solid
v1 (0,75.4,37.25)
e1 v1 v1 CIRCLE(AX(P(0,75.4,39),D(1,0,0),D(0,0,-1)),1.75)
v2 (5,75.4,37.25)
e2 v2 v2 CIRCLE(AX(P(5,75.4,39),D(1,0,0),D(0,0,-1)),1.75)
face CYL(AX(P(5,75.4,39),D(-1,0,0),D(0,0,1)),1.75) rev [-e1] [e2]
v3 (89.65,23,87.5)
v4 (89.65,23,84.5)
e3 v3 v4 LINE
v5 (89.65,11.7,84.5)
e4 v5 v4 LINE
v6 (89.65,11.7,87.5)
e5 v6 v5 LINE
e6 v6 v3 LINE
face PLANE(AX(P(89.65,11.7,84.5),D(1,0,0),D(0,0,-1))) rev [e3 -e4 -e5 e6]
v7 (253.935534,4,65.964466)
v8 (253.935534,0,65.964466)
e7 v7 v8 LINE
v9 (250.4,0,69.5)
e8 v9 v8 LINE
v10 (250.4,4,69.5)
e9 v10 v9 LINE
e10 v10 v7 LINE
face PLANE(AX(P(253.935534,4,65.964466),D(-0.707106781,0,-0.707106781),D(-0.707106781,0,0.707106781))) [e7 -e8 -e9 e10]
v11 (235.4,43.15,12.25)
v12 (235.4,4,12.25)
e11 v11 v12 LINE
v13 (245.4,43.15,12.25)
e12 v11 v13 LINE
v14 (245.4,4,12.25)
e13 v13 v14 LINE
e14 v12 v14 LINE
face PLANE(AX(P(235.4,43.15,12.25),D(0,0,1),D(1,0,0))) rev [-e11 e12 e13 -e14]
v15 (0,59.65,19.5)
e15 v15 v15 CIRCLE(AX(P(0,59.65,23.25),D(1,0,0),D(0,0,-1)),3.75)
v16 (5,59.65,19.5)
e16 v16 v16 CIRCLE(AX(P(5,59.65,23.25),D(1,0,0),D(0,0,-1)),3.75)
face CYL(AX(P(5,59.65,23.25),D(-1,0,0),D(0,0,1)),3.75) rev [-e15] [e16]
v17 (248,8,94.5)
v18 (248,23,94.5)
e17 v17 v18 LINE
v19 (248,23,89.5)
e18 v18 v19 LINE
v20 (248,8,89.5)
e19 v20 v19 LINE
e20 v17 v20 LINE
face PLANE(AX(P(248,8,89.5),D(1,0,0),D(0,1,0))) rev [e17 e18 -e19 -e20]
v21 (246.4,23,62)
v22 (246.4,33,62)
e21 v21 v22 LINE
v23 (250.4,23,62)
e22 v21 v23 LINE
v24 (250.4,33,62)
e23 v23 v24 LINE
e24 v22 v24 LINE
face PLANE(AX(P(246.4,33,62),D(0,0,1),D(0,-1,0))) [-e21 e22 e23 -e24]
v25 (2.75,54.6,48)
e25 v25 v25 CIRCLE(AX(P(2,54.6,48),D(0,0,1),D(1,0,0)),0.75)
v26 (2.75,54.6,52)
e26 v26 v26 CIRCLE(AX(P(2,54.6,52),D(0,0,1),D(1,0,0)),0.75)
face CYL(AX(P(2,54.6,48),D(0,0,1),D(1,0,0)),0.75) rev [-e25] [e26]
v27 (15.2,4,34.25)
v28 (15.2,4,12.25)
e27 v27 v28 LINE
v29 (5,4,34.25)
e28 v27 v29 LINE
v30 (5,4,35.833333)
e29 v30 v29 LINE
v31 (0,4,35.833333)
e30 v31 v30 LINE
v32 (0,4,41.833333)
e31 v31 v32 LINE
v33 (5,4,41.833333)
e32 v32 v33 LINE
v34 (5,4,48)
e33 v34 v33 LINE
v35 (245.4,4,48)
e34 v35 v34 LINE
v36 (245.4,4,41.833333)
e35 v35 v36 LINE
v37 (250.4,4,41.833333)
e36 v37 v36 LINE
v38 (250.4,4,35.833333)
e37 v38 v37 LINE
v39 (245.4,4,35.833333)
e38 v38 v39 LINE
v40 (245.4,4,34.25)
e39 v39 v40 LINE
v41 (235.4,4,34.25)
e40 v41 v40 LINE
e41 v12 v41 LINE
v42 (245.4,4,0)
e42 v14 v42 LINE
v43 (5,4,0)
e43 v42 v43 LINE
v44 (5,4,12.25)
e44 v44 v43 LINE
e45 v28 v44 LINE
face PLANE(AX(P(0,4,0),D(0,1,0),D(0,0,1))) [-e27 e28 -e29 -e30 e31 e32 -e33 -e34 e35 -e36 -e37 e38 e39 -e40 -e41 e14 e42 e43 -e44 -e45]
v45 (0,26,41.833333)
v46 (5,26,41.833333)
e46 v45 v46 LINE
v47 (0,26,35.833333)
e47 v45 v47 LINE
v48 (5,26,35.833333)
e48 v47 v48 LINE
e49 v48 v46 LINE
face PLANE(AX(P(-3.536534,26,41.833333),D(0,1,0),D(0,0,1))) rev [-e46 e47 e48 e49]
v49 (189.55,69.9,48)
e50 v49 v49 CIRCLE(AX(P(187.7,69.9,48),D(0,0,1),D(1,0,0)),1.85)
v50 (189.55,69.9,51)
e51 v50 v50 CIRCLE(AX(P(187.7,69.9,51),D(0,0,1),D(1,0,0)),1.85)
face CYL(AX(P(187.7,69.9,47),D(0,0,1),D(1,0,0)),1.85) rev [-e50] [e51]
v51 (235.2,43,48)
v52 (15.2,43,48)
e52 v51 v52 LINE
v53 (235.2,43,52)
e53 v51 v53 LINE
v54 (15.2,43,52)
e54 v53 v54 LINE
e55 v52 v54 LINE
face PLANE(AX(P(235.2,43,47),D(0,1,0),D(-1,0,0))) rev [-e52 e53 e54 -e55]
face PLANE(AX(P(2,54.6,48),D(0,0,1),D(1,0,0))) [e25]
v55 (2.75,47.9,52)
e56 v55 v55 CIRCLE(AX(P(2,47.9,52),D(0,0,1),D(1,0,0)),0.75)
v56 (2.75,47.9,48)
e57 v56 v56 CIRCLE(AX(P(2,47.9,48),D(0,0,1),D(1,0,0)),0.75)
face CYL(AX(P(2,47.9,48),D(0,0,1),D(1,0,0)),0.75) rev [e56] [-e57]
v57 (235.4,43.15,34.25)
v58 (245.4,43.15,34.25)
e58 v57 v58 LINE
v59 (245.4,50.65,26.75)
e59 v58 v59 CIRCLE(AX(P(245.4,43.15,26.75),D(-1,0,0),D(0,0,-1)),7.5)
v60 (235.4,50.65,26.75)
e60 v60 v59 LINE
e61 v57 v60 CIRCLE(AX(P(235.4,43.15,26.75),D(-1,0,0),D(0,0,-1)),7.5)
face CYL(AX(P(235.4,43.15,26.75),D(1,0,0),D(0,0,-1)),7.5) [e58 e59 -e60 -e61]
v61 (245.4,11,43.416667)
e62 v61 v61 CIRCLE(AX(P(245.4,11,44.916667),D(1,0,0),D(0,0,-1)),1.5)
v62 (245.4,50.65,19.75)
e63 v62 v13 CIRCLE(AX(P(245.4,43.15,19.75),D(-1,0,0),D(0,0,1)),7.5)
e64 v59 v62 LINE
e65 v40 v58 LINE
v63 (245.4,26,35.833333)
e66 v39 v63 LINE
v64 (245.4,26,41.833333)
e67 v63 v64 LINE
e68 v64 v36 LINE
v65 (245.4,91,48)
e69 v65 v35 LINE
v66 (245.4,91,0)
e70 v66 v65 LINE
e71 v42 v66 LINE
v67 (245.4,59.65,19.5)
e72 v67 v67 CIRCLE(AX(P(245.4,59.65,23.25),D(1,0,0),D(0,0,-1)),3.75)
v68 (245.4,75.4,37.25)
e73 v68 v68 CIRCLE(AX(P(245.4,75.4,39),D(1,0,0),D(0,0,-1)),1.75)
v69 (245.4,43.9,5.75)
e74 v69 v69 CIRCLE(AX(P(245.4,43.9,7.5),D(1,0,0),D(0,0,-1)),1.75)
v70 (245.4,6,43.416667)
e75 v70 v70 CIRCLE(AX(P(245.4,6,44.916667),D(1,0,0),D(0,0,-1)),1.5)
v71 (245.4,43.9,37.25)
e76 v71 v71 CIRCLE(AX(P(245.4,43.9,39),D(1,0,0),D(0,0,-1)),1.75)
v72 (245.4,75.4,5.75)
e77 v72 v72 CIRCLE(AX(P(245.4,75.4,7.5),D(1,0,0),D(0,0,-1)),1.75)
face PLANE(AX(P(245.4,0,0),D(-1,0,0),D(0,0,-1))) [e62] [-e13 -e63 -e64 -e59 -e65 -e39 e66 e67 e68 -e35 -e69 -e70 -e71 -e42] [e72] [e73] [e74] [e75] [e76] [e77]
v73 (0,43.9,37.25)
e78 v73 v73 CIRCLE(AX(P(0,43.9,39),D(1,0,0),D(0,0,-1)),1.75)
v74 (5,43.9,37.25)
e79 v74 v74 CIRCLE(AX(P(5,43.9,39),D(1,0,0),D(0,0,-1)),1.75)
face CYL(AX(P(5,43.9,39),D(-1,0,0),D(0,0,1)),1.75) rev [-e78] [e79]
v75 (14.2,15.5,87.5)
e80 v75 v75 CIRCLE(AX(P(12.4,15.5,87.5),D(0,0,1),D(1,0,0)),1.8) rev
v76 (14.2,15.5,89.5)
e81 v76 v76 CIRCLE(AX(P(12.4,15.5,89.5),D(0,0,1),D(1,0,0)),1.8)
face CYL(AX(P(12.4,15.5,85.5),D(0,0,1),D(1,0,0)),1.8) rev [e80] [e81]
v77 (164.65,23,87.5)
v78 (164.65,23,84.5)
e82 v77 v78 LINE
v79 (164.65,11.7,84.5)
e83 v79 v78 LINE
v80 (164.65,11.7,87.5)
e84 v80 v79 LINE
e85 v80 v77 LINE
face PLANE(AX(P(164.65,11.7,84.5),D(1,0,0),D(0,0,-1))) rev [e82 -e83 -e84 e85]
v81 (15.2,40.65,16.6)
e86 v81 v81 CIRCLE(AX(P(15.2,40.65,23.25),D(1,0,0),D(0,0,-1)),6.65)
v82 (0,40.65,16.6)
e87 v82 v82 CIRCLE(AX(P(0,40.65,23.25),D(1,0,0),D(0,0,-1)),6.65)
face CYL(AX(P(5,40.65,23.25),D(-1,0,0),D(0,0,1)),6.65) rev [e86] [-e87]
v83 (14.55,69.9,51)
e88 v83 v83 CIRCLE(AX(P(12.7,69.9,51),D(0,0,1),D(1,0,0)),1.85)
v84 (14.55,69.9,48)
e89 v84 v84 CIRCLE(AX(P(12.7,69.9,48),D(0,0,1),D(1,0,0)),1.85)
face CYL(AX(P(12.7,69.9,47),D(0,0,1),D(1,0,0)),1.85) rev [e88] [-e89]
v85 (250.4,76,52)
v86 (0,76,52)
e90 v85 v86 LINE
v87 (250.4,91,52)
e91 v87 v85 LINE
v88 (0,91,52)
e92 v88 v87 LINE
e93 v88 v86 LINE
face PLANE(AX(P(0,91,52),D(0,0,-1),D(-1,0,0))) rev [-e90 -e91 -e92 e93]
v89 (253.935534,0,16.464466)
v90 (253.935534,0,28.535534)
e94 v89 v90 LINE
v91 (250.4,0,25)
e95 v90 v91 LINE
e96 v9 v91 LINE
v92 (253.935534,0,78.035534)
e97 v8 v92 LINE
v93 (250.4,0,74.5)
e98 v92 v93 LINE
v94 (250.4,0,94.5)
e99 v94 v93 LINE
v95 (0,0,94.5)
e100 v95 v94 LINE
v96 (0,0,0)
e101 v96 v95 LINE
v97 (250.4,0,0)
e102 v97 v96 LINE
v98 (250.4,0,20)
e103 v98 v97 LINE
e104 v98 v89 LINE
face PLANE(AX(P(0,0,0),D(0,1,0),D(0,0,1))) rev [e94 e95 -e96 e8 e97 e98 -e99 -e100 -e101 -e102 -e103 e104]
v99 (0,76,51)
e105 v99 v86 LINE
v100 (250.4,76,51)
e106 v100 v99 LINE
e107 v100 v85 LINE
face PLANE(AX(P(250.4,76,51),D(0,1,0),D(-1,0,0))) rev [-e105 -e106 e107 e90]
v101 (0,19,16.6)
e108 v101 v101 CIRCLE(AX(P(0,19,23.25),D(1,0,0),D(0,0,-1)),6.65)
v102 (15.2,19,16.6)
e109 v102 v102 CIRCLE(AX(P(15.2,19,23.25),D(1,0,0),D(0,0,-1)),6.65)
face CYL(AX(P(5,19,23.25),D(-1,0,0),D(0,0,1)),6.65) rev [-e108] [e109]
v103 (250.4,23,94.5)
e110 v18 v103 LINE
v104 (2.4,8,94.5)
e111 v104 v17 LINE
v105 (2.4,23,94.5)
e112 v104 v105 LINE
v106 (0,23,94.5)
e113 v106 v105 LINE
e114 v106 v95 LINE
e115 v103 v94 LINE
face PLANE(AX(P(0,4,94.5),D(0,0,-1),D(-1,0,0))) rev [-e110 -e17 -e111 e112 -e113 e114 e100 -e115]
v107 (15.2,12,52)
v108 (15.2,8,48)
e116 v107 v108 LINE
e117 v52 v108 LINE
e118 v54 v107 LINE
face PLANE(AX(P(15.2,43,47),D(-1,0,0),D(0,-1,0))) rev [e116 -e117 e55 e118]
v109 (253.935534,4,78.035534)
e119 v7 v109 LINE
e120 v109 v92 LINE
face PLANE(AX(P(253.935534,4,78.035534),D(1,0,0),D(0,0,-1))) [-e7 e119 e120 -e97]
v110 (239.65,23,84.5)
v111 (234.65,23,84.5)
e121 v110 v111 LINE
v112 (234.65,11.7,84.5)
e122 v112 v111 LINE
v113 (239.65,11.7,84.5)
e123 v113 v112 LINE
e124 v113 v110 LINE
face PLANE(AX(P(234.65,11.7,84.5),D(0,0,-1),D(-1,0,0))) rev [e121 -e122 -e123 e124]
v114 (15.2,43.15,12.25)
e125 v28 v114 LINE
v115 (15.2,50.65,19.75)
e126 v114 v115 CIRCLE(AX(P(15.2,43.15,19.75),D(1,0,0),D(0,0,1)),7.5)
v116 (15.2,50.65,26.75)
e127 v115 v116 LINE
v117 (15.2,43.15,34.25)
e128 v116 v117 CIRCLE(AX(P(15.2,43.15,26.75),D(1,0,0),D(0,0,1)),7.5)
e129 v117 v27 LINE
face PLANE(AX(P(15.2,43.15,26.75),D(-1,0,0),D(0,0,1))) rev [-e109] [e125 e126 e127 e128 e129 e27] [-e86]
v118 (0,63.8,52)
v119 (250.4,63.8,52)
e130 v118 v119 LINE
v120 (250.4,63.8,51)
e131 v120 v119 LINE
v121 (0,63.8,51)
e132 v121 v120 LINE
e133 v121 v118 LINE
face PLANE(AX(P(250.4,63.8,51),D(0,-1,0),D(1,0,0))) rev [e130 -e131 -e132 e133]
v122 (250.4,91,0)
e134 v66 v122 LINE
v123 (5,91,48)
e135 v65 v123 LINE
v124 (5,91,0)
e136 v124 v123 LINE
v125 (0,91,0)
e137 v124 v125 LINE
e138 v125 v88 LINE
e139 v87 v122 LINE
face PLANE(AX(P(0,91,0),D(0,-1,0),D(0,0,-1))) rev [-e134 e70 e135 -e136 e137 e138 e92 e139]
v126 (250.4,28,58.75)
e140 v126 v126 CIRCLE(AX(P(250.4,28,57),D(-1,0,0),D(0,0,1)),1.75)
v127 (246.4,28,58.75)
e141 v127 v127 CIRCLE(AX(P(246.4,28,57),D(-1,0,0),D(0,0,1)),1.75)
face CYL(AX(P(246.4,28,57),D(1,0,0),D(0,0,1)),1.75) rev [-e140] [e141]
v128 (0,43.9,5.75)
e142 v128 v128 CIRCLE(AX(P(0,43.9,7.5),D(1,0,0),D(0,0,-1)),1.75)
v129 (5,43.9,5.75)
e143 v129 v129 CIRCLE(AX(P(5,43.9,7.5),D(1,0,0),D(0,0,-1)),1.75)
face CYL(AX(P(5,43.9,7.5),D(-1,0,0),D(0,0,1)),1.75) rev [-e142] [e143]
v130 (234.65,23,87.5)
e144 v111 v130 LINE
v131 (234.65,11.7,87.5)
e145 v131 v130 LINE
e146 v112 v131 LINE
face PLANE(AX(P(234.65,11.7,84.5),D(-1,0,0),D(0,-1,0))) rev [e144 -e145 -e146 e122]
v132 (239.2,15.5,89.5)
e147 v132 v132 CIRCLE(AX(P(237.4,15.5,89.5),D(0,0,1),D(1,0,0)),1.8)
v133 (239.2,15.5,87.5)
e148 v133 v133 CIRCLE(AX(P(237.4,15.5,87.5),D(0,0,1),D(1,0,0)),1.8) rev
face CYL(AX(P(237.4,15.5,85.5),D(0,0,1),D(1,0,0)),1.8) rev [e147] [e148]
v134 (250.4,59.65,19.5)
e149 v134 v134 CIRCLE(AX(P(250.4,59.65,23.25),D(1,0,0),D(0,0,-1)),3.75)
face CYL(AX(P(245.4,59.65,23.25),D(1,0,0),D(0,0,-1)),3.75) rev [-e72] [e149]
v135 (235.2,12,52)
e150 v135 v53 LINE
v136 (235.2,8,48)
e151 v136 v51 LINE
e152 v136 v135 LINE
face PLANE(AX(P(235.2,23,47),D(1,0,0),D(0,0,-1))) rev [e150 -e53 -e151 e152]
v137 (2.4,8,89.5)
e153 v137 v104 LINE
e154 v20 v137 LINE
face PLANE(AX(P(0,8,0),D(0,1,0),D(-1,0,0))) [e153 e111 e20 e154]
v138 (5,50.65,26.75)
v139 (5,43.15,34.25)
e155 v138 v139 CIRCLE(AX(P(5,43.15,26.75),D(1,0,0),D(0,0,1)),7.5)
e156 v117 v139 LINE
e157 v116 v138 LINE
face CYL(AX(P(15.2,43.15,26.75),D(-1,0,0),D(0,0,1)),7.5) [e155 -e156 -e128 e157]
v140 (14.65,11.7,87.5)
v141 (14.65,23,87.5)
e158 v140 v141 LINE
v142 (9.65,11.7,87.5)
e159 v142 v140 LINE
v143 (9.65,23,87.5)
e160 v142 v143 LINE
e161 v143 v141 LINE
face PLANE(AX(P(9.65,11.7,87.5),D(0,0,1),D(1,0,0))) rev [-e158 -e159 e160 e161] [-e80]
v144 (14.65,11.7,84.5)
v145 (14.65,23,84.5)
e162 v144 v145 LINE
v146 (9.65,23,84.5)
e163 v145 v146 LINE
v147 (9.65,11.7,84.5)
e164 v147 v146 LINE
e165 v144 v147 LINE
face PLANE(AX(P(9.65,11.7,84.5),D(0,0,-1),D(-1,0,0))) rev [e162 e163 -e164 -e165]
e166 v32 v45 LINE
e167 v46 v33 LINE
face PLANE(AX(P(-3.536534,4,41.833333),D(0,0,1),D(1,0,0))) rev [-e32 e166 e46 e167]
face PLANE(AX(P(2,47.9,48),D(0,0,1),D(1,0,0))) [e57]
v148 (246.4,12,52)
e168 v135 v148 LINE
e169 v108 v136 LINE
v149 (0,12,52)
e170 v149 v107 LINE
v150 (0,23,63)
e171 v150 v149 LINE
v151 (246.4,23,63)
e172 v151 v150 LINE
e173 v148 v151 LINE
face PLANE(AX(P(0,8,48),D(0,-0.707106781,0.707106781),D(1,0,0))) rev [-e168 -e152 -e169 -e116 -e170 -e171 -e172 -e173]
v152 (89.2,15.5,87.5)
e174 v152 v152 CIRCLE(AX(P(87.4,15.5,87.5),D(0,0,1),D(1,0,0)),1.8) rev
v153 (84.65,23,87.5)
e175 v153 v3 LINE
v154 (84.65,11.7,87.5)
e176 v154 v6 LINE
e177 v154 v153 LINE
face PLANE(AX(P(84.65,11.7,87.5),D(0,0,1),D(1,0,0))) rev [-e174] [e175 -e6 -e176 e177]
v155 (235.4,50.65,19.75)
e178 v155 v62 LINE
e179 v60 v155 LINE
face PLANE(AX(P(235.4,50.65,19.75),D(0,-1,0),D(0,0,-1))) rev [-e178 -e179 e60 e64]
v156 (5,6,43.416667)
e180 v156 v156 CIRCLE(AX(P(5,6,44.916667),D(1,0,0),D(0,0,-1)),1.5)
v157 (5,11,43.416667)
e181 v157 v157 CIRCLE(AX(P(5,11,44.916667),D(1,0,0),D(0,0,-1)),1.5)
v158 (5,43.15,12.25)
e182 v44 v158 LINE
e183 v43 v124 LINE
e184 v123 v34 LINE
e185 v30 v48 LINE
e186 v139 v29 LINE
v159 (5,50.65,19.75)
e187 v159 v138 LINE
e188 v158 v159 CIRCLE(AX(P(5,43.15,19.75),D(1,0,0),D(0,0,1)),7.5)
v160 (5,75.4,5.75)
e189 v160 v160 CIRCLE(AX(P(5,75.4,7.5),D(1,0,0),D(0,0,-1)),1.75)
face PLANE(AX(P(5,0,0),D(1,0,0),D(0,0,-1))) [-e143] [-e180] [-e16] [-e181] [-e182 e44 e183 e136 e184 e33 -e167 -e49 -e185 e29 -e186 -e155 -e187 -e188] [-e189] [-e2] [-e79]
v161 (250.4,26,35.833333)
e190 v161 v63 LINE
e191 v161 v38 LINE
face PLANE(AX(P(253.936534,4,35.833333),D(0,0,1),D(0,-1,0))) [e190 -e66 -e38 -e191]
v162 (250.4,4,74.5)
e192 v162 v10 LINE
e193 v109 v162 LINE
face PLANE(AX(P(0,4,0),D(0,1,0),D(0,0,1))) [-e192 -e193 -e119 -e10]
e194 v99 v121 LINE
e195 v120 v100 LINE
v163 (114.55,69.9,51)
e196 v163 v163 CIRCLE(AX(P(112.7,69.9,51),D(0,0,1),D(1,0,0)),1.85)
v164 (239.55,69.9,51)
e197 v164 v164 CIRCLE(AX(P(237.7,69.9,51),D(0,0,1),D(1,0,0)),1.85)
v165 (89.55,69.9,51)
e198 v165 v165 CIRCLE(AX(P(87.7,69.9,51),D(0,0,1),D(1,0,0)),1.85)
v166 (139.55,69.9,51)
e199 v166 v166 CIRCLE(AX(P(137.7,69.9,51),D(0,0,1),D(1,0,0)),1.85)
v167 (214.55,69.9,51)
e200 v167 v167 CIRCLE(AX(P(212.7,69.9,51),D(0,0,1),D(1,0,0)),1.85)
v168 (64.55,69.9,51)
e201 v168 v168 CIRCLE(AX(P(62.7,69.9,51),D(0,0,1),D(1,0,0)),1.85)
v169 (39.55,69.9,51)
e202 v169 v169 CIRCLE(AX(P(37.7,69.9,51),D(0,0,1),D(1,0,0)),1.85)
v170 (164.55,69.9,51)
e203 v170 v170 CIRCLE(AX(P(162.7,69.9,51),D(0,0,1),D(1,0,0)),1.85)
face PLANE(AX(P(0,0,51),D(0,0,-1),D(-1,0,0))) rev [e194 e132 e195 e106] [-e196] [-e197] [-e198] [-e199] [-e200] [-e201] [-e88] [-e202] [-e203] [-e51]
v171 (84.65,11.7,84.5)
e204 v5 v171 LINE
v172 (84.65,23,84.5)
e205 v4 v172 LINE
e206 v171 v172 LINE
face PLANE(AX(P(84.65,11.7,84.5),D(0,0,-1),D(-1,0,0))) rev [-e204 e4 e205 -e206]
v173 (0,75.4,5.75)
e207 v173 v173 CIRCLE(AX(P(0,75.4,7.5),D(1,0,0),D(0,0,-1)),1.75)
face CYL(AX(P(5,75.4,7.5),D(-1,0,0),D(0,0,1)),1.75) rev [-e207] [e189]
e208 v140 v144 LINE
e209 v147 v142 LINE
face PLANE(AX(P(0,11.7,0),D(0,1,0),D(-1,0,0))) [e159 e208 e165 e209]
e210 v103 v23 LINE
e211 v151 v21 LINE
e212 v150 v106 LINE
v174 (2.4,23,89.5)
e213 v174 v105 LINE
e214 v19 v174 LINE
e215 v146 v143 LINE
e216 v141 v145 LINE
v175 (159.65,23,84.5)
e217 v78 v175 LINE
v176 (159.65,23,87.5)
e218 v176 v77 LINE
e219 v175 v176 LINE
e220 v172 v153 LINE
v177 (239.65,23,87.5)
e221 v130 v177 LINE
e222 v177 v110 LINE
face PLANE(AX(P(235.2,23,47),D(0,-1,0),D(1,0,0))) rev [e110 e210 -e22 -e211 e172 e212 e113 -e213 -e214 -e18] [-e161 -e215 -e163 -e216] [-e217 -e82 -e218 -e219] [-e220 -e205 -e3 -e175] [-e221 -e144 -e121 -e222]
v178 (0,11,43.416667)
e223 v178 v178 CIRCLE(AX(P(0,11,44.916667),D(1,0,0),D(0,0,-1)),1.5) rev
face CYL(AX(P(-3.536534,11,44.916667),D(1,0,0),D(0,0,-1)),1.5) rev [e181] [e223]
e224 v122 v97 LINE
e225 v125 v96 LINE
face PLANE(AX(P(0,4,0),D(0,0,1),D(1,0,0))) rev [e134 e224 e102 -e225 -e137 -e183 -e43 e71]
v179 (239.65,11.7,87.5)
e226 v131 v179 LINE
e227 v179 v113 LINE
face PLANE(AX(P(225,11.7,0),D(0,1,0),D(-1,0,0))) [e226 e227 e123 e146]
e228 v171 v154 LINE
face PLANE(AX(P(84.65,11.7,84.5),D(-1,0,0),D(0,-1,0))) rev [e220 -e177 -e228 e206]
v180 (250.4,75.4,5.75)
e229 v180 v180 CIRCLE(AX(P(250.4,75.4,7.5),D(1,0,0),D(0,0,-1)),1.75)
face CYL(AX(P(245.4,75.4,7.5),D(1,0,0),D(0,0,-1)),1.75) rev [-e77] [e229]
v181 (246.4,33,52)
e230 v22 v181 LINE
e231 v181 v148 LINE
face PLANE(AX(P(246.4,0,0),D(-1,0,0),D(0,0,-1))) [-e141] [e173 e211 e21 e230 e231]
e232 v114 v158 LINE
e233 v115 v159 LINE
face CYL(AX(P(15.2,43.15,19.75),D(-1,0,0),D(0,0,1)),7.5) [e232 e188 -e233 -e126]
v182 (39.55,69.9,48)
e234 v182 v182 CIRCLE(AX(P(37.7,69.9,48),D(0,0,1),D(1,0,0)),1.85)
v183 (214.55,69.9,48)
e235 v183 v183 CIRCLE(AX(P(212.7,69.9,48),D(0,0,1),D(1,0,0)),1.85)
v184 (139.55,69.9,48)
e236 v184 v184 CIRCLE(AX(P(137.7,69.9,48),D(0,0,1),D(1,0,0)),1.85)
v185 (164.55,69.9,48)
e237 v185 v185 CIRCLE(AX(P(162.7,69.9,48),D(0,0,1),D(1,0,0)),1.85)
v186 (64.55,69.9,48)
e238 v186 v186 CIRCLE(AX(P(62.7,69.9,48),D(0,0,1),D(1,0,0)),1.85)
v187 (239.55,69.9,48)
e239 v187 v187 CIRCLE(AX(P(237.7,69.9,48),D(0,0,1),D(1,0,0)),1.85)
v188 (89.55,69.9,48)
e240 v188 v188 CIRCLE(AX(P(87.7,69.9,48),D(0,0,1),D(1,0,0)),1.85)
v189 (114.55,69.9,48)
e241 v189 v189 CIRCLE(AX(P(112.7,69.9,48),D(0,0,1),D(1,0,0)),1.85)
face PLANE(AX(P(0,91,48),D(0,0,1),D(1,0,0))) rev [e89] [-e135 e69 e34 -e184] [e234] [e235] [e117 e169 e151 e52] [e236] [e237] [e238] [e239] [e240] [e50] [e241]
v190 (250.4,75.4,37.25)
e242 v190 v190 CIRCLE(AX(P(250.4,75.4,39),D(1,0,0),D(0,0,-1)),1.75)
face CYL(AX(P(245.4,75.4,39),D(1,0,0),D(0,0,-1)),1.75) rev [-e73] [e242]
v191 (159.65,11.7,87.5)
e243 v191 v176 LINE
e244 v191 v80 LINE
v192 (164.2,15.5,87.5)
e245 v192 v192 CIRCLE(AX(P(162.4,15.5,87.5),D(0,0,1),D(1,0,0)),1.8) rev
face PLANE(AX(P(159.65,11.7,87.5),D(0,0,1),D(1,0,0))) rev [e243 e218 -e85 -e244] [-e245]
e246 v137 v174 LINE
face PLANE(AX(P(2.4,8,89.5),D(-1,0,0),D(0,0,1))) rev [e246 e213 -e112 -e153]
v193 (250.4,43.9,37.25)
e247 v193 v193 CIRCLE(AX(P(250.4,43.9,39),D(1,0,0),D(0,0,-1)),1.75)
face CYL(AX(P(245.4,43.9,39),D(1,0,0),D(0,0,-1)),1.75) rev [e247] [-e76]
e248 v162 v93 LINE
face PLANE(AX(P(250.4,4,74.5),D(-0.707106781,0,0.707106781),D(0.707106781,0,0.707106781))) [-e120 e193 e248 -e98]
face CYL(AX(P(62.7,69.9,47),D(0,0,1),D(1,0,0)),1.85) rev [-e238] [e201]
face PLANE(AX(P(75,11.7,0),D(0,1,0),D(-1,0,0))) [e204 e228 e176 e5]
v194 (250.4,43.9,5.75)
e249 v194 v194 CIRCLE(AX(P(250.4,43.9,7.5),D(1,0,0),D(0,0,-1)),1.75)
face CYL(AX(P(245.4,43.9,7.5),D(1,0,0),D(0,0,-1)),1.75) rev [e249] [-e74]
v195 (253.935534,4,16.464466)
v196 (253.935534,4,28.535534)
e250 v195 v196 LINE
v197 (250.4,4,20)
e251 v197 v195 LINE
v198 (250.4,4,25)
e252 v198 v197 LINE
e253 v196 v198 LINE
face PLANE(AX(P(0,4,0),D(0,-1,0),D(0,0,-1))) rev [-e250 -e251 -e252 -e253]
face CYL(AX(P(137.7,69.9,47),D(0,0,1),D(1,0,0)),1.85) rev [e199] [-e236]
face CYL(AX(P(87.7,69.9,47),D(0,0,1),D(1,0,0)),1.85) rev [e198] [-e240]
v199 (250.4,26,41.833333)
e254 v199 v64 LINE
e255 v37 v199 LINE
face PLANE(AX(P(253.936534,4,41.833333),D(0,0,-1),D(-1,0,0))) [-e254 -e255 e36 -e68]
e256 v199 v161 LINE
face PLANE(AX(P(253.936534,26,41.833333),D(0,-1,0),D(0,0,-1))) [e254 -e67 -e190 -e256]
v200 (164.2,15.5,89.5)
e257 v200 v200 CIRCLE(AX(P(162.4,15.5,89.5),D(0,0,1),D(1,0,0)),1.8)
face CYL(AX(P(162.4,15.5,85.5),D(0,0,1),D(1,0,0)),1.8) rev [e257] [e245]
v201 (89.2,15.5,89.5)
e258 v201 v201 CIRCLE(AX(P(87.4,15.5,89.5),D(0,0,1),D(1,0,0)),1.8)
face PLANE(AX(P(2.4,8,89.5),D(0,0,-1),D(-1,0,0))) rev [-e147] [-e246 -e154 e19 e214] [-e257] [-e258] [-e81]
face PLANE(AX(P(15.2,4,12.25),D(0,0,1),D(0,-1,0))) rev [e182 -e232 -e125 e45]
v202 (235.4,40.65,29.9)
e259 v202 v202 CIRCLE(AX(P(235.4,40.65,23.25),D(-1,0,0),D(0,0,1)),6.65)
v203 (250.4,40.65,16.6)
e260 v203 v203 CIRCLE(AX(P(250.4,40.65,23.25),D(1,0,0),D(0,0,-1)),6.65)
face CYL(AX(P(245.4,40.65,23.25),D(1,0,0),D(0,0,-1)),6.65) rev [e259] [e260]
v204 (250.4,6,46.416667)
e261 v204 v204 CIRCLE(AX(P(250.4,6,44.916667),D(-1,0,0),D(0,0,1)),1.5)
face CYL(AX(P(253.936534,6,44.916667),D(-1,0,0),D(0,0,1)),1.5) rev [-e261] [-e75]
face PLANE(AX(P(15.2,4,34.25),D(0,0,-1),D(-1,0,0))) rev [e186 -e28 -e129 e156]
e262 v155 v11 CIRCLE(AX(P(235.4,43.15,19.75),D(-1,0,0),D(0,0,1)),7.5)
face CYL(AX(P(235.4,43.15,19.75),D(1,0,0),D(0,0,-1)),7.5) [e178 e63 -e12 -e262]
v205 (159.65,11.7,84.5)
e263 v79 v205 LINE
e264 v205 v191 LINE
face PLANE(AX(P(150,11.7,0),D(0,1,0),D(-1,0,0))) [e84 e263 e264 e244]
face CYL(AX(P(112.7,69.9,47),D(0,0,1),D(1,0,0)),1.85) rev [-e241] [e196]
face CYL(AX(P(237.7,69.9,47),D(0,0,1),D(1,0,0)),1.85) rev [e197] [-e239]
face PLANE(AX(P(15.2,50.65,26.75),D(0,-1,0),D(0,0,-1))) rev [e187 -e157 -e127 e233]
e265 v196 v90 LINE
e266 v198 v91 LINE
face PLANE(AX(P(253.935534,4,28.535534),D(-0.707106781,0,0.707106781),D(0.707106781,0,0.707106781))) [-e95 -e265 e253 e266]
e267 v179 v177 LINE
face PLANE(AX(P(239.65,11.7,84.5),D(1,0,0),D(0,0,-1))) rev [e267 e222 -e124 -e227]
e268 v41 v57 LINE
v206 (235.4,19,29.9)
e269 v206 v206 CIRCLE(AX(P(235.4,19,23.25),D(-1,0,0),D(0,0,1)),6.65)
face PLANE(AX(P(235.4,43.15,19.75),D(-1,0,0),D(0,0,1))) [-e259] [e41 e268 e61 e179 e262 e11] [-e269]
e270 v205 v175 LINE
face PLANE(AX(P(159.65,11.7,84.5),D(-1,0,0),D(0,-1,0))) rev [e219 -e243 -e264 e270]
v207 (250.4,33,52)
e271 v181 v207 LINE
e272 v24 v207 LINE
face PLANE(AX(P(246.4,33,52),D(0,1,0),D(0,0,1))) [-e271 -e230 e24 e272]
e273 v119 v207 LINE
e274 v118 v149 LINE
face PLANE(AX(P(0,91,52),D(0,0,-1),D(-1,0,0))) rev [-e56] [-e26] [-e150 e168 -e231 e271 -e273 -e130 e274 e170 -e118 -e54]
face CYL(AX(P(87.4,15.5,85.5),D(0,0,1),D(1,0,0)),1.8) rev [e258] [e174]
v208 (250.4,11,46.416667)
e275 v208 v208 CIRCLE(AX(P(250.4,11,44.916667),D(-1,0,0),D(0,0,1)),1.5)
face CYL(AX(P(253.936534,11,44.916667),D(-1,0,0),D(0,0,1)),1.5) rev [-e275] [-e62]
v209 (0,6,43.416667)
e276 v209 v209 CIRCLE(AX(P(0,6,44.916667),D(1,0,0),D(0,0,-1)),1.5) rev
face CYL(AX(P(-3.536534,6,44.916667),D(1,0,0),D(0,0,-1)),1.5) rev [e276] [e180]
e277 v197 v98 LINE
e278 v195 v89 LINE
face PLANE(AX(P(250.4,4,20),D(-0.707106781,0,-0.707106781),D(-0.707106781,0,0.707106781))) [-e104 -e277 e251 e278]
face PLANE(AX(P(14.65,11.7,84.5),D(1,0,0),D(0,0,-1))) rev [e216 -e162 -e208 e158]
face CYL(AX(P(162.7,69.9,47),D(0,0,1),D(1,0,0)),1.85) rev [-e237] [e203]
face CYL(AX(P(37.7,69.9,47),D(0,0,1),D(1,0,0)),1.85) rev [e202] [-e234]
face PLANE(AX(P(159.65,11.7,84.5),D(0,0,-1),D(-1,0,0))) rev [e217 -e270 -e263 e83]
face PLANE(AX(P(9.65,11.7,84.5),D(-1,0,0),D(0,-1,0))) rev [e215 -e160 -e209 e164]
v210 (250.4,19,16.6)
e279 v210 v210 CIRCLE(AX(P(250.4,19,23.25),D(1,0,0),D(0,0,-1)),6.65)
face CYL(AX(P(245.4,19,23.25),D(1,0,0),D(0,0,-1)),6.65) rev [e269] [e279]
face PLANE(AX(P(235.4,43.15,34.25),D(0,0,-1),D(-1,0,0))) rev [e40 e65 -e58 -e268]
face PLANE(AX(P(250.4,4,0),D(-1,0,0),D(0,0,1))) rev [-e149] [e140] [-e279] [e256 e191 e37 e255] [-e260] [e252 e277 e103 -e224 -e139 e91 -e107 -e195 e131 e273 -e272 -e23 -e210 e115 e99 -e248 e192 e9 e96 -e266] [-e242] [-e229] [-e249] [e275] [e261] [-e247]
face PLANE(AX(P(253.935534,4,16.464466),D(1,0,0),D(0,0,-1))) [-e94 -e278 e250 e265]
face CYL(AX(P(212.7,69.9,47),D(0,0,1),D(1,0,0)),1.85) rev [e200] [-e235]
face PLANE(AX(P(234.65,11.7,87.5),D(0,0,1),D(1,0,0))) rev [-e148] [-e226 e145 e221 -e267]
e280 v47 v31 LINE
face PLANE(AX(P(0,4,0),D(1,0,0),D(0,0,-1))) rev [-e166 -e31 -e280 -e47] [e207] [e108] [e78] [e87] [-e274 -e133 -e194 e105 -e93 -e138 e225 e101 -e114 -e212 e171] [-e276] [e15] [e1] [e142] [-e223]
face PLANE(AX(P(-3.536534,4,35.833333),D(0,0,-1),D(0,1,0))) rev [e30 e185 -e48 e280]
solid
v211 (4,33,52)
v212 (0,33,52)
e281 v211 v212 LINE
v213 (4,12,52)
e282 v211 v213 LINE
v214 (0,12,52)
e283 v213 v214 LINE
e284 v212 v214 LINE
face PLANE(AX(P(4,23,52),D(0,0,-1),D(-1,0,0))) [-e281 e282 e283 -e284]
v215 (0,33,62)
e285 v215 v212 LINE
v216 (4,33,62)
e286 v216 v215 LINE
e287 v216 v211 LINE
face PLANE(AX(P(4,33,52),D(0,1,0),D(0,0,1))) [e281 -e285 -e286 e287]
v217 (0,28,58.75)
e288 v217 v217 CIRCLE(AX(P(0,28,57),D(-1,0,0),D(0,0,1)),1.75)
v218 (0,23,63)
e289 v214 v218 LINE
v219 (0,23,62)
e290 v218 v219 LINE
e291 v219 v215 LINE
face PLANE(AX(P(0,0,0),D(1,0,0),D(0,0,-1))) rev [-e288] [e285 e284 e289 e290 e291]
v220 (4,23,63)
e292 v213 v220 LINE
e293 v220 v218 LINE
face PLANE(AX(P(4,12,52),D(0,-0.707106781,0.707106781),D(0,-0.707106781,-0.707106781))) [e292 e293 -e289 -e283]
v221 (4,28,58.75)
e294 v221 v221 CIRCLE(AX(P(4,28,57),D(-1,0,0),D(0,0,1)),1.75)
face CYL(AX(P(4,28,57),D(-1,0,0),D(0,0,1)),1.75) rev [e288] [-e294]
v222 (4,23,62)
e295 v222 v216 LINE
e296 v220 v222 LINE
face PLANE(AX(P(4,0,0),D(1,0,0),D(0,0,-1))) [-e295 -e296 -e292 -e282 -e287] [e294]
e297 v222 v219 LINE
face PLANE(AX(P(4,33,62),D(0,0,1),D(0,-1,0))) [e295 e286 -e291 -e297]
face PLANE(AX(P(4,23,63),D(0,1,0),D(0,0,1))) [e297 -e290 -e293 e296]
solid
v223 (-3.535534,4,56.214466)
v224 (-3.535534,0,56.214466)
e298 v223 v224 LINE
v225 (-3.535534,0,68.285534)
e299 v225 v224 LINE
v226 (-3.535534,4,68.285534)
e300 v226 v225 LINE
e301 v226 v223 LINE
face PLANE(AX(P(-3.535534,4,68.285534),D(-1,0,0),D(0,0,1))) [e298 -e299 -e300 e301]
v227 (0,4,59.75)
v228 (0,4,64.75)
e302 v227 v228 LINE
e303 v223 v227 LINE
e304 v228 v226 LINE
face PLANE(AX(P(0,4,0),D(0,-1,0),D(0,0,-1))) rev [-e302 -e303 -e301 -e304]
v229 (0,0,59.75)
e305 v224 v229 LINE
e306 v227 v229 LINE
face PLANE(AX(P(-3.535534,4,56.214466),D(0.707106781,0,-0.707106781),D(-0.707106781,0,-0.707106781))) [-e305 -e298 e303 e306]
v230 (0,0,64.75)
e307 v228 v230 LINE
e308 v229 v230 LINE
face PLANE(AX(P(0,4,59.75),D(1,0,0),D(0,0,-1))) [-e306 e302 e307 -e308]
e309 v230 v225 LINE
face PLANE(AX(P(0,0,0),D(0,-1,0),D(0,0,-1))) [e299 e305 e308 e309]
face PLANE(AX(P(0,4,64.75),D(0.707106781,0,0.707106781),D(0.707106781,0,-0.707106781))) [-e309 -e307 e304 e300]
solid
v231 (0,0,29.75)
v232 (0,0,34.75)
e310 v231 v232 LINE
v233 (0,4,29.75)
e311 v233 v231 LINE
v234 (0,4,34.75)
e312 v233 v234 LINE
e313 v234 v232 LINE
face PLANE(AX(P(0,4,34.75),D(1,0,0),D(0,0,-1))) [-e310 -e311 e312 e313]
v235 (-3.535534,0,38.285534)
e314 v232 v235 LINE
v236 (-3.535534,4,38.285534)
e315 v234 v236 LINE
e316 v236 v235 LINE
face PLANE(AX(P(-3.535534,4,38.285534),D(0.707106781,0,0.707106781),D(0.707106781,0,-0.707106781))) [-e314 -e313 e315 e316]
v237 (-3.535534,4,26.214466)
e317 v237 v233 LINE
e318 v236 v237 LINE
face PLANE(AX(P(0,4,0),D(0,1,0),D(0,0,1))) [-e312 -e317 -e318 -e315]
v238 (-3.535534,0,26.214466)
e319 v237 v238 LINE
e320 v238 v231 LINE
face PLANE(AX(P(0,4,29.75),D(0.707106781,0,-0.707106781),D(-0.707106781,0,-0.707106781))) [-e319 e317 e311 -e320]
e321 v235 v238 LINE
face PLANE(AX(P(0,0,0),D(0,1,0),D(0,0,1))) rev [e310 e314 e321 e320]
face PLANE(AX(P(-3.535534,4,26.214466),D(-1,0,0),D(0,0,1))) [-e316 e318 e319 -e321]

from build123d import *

# Parameters (mm, degrees)
SKETCH21_W                   = 250.4
SKETCH21_H                   = 94.5
BASE_DEPTH                   = 4
SKETCH22_W                   = 250.4
SKETCH22_H                   = 4
MAINWALL_DEPTH               = 87
SKETCH2_W                    = 250.4
SKETCH2_H                    = 12.2
RAILCUTOUT_DEPTH             = 1
SKETCH6_W                    = 220
SKETCH6_H                    = 20
PAPERCHANNEL_DEPTH           = 5
SKETCH3_R                    = 1.85
RAILSCREWHOLE_DEPTH          = 4
RAILSCREWPATTERN_COUNT       = 10
RAILSCREWPATTERN_PITCH       = 25
SKETCH13_W                   = 48
SKETCH13_H                   = 87
YWALL_DEPTH                  = 5
SKETCH20_W                   = 250.4
SKETCH20_H                   = 42.5
BASEEXTENSION_DEPTH          = 19
SKETCH14_R                   = 6.65
SKETCH14_R_2                 = 3.75
SKETCH14_R_3                 = 1.75
MOTORSCREWBEARINGHOLES_DEPTH = 5
SKETCH26_R                   = 6.65
LEFTROLLEROFFSET_DEPTH       = 10.2
CHAMFER2_SIZE                = 15
RIGHTROLLEROFFSET_START      = 10
SKETCH28_R                   = 6.65
RIGHTROLLEROFFSET_DEPTH      = 10
SKETCH29_R                   = 1.75
BACKMOUNTSCREW_DEPTH         = 4
DOVETAILS_LEFT_DEPTH         = 4
DOVETAILS_LEFT_2_DEPTH       = 4
DOVETAILS_RIGHT_DEPTH        = 4
SKETCH43_R                   = 0.75
ENDSTOP_SCREW_HOLES_DEPTH    = 4
SKETCH44_R                   = 1.5
SKETCH44_W                   = 6
SKETCH44_H                   = 22
CABLE_PASSTHROUGH_DEPTH      = 5
SKETCH46_W                   = 245.6
SKETCH46_H                   = 5
CHANNEL_CUTOUT_DEPTH         = 15
SKETCH47_R                   = 1.8
CHANNEL_SCREW_HOLE_DEPTH     = 4
SKETCH48_W                   = 5
SKETCH48_H                   = 3
CHANNEL_NUT_HOLE_DEPTH       = 11.3
LPATTERN1_COUNT              = 4
LPATTERN1_PITCH              = 75


with BuildPart() as part:
    # Sketch21 → Base (new body)
    with BuildSketch(Plane(origin=(0, 0, 0), x_dir=(1, 0, 0), z_dir=(0, 1, 0))):
        with Locations((125.2, -47.25)):
            Rectangle(SKETCH21_W, SKETCH21_H)
    extrude(amount=BASE_DEPTH)

    # Sketch22 → MainWall (add)
    with BuildSketch(Plane(origin=(0, 4, 0), x_dir=(1, 0, 0), z_dir=(0, 1, 0))):
        with Locations((125.2, -50)):
            Rectangle(SKETCH22_W, SKETCH22_H)
    extrude(amount=MAINWALL_DEPTH)

    # Sketch2 → RailCutout (cut)
    with BuildSketch(Plane.XY.offset(52)):
        with Locations((125.2, 69.9)):
            Rectangle(SKETCH2_W, SKETCH2_H)
    extrude(amount=-RAILCUTOUT_DEPTH, mode=Mode.SUBTRACT)

    # Sketch6 → PaperChannel (cut)
    with BuildSketch(Plane.XY.offset(52)):
        with Locations((125.2, 33)):
            Rectangle(SKETCH6_W, SKETCH6_H)
    extrude(amount=-PAPERCHANNEL_DEPTH, mode=Mode.SUBTRACT)

    # Sketch3 → RailScrewHole (cut)
    with BuildSketch(Plane.XY.offset(51)):
        with Locations((237.7, 69.9)):
            Circle(SKETCH3_R)
    railscrewhole = extrude(amount=-RAILSCREWHOLE_DEPTH, mode=Mode.SUBTRACT)

    # RailScrewPattern: RailScrewHole ×10
    with Locations(*[(-i * RAILSCREWPATTERN_PITCH, 0, 0) for i in range(1, RAILSCREWPATTERN_COUNT)]):
        add(railscrewhole, mode=Mode.SUBTRACT)

    # Sketch13 → YWall (add)
    with BuildSketch(Plane(origin=(0, 0, 0), x_dir=(0, 0, -1), z_dir=(1, 0, 0))):
        with Locations((-24, 47.5)):
            Rectangle(SKETCH13_W, SKETCH13_H)
    ywall = extrude(amount=YWALL_DEPTH)

    # Sketch20 → BaseExtension (add)
    with BuildSketch(Plane(origin=(0, 4, 0), x_dir=(1, 0, 0), z_dir=(0, 1, 0))):
        with Locations((125.2, -73.25)):
            Rectangle(SKETCH20_W, SKETCH20_H)
    extrude(amount=BASEEXTENSION_DEPTH)

    # Sketch14 → MotorScrewBearingHoles (cut)
    with BuildSketch(Plane(origin=(0, 0, 0), x_dir=(0, 0, -1), z_dir=(1, 0, 0))):
        with Locations((-23.25, 19)):
            Circle(SKETCH14_R)
        with Locations((-23.25, 40.65)):
            Circle(SKETCH14_R)
        with Locations((-23.25, 59.65)):
            Circle(SKETCH14_R_2)
        with Locations((-7.5, 43.9)):
            Circle(SKETCH14_R_3)
        with Locations((-7.5, 75.4)):
            Circle(SKETCH14_R_3)
        with Locations((-39, 75.4)):
            Circle(SKETCH14_R_3)
        with Locations((-39, 43.9)):
            Circle(SKETCH14_R_3)
    motorscrewbearingholes = extrude(amount=MOTORSCREWBEARINGHOLES_DEPTH, mode=Mode.SUBTRACT)

    # MirrorYWallHoles: YWall, MotorScrewBearingHoles across plane
    add(ywall.mirror(Plane.ZY.offset(-125.2)))
    add(motorscrewbearingholes.mirror(Plane.ZY.offset(-125.2)), mode=Mode.SUBTRACT)

    # Sketch26 → LeftRollerOffset (add)
    with BuildSketch(Plane(origin=(5, 0, 0), x_dir=(0, 0, -1), z_dir=(1, 0, 0))):
        with BuildLine():
            Line((-34.25, 4), (-12.25, 4))
            Line((-12.25, 4), (-12.25, 43.15))
            ThreePointArc((-12.25, 43.15), (-14.446699141, 48.453300859), (-19.75, 50.65))
            Line((-19.75, 50.65), (-26.75, 50.65))
            ThreePointArc((-26.75, 50.65), (-32.053300859, 48.453300859), (-34.25, 43.15))
            Line((-34.25, 43.15), (-34.25, 4))
        make_face()
        with Locations((-23.25, 19)):
            Circle(SKETCH26_R, mode=Mode.SUBTRACT)
        with Locations((-23.25, 40.65)):
            Circle(SKETCH26_R, mode=Mode.SUBTRACT)
    extrude(amount=LEFTROLLEROFFSET_DEPTH)

    # Chamfer2
    # the kernel refuses this chamfer: 15 mm, written as the material it takes off along each edge
    with BuildSketch(Plane(origin=(273.775244819, 23, 48), x_dir=(0, 0.02749587661058632, 0.9996219169112968), z_dir=(-1, 0, 0))) as chamfer2_piece_1_section:
        Polygon((CHAMFER2_SIZE * 0.999621916911, -CHAMFER2_SIZE * 0.0274958766106), (-CHAMFER2_SIZE * 0.0274958766106, -CHAMFER2_SIZE * 0.999621916911), (0, 0), align=None)
    chamfer2_piece_1 = extrude(amount=297.150489639, mode=Mode.PRIVATE)
    chamfer2_piece_1 = split(chamfer2_piece_1, bisect_by=Plane(origin=(247.9, 19.333333333, 52), z_dir=(0, 0, 1)), keep=Keep.TOP, mode=Mode.PRIVATE)
    add(chamfer2_piece_1, mode=Mode.SUBTRACT)
    with BuildSketch(Plane(origin=(235.2, 23, 48), x_dir=(0, 0.02749587661058632, 0.9996219169112968), z_dir=(-1, 0, 0))) as chamfer2_piece_2:
        Polygon((CHAMFER2_SIZE * 0.999621916911, -CHAMFER2_SIZE * 0.0274958766106), (-CHAMFER2_SIZE * 0.0274958766106, -CHAMFER2_SIZE * 0.999621916911), (0, 0), align=None)
    extrude(amount=220, mode=Mode.SUBTRACT)

    # Sketch28 → RightRollerOffset (add)
    with BuildSketch(Plane.ZY.offset(-245.4).offset(RIGHTROLLEROFFSET_START)):
        with BuildLine():
            Line((19.75, 50.65), (26.75, 50.65))
            ThreePointArc((26.75, 50.65), (32.053300859, 48.453300859), (34.25, 43.15))
            Line((34.25, 43.15), (34.25, 4))
            Line((34.25, 4), (12.25, 4))
            Line((12.25, 4), (12.25, 43.15))
            ThreePointArc((12.25, 43.15), (14.446699141, 48.453300859), (19.75, 50.65))
        make_face()
        with Locations(Location((23.25, 40.65, 0), (0, 0, 180))):
            Circle(SKETCH28_R, mode=Mode.SUBTRACT)
        with Locations(Location((23.25, 19, 0), (0, 0, 180))):
            Circle(SKETCH28_R, mode=Mode.SUBTRACT)
    extrude(amount=-RIGHTROLLEROFFSET_DEPTH)


with BuildPart() as body_2:
    # Sketch29 → BackMountScrew (new body)
    with BuildSketch(Plane.ZY):
        Polygon((52, 23), (52, 33), (62, 33), (62, 23), (63, 23), (52, 12), align=None)
        with Locations((57, 28)):
            Circle(SKETCH29_R, mode=Mode.SUBTRACT)
    backmountscrew = extrude(amount=-BACKMOUNTSCREW_DEPTH)


with BuildPart() as part_1:
    add(part.part)

    # Mirror5: BackMountScrew across plane
    add(backmountscrew.mirror(Plane.ZY.offset(-125.2)))

    # Sketch49 → Dovetails_Right (add)
    with BuildSketch(Plane.XZ):
        Polygon((250.4, 74.5), (253.935533906, 78.035533906), (253.935533906, 65.964466094), (250.4, 69.5), align=None)
        Polygon((250.4, 25), (250.4, 20), (253.935533906, 16.464466094), (253.935533906, 28.535533906), align=None)
    extrude(amount=-DOVETAILS_RIGHT_DEPTH)

    # Sketch43 → Endstop_Screw_Holes (cut)
    with BuildSketch(Plane.XY.offset(52)):
        with Locations((2, 54.6)):
            Circle(SKETCH43_R)
        with Locations((2, 47.9)):
            Circle(SKETCH43_R)
    extrude(amount=-ENDSTOP_SCREW_HOLES_DEPTH, mode=Mode.SUBTRACT)

    # Sketch44 → Cable_Passthrough (cut)
    with BuildSketch(Plane(origin=(5, 0, 0), x_dir=(0, 0, -1), z_dir=(1, 0, 0))):
        with Locations((-44.916666667, 11)):
            Circle(SKETCH44_R)
        with Locations((-44.916666667, 6)):
            Circle(SKETCH44_R)
        with Locations((-38.833333333, 15)):
            Rectangle(SKETCH44_W, SKETCH44_H)
    cable_passthrough = extrude(amount=-CABLE_PASSTHROUGH_DEPTH, mode=Mode.SUBTRACT)

    # Cabble_Passthrough_Mirror: Cable_Passthrough across plane
    add(cable_passthrough.mirror(Plane.ZY.offset(-125.2)), mode=Mode.SUBTRACT)

    # Sketch46 → Channel_Cutout (cut)
    with BuildSketch(Plane(origin=(0, 23, 0), x_dir=(1, 0, 0), z_dir=(0, 1, 0))):
        with Locations((125.2, -92)):
            Rectangle(SKETCH46_W, SKETCH46_H)
    extrude(amount=-CHANNEL_CUTOUT_DEPTH, mode=Mode.SUBTRACT)

    # Sketch47 → Channel_Screw_Hole (cut)
    with BuildSketch(Plane.XY.offset(89.5)):
        with Locations((12.4, 15.5)):
            Circle(SKETCH47_R)
    channel_screw_hole = extrude(amount=-CHANNEL_SCREW_HOLE_DEPTH, mode=Mode.SUBTRACT)

    # Sketch48 → Channel_Nut_Hole (cut)
    with BuildSketch(Plane(origin=(0, 23, 0), x_dir=(1, 0, 0), z_dir=(0, 1, 0))):
        with Locations((12.15, -86)):
            Rectangle(SKETCH48_W, SKETCH48_H)
    channel_nut_hole = extrude(amount=-CHANNEL_NUT_HOLE_DEPTH, mode=Mode.SUBTRACT)

    # LPattern1: Channel_Screw_Hole, Channel_Nut_Hole ×4
    with Locations(*[(i * LPATTERN1_PITCH, 0, 0) for i in range(1, LPATTERN1_COUNT)]):
        add(channel_screw_hole, mode=Mode.SUBTRACT)
        add(channel_nut_hole, mode=Mode.SUBTRACT)


with BuildPart() as body_3:
    # Sketch34 → Dovetails_Left (new body)
    with BuildSketch(Plane.XZ):
        Polygon((0, 64.75), (-3.535533906, 68.285533906), (-3.535533906, 56.214466094), (0, 59.75), align=None)
    extrude(amount=-DOVETAILS_LEFT_DEPTH)


with BuildPart() as body_4:
    # Sketch34 → Dovetails_Left 2 (new body)
    with BuildSketch(Plane.XZ):
        Polygon((-3.535533906, 38.285533906), (0, 34.75), (0, 29.75), (-3.535533906, 26.214466094), align=None)
    extrude(amount=-DOVETAILS_LEFT_2_DEPTH)


solid = Compound([body_2.part, part_1.part, body_3.part, body_4.part])
